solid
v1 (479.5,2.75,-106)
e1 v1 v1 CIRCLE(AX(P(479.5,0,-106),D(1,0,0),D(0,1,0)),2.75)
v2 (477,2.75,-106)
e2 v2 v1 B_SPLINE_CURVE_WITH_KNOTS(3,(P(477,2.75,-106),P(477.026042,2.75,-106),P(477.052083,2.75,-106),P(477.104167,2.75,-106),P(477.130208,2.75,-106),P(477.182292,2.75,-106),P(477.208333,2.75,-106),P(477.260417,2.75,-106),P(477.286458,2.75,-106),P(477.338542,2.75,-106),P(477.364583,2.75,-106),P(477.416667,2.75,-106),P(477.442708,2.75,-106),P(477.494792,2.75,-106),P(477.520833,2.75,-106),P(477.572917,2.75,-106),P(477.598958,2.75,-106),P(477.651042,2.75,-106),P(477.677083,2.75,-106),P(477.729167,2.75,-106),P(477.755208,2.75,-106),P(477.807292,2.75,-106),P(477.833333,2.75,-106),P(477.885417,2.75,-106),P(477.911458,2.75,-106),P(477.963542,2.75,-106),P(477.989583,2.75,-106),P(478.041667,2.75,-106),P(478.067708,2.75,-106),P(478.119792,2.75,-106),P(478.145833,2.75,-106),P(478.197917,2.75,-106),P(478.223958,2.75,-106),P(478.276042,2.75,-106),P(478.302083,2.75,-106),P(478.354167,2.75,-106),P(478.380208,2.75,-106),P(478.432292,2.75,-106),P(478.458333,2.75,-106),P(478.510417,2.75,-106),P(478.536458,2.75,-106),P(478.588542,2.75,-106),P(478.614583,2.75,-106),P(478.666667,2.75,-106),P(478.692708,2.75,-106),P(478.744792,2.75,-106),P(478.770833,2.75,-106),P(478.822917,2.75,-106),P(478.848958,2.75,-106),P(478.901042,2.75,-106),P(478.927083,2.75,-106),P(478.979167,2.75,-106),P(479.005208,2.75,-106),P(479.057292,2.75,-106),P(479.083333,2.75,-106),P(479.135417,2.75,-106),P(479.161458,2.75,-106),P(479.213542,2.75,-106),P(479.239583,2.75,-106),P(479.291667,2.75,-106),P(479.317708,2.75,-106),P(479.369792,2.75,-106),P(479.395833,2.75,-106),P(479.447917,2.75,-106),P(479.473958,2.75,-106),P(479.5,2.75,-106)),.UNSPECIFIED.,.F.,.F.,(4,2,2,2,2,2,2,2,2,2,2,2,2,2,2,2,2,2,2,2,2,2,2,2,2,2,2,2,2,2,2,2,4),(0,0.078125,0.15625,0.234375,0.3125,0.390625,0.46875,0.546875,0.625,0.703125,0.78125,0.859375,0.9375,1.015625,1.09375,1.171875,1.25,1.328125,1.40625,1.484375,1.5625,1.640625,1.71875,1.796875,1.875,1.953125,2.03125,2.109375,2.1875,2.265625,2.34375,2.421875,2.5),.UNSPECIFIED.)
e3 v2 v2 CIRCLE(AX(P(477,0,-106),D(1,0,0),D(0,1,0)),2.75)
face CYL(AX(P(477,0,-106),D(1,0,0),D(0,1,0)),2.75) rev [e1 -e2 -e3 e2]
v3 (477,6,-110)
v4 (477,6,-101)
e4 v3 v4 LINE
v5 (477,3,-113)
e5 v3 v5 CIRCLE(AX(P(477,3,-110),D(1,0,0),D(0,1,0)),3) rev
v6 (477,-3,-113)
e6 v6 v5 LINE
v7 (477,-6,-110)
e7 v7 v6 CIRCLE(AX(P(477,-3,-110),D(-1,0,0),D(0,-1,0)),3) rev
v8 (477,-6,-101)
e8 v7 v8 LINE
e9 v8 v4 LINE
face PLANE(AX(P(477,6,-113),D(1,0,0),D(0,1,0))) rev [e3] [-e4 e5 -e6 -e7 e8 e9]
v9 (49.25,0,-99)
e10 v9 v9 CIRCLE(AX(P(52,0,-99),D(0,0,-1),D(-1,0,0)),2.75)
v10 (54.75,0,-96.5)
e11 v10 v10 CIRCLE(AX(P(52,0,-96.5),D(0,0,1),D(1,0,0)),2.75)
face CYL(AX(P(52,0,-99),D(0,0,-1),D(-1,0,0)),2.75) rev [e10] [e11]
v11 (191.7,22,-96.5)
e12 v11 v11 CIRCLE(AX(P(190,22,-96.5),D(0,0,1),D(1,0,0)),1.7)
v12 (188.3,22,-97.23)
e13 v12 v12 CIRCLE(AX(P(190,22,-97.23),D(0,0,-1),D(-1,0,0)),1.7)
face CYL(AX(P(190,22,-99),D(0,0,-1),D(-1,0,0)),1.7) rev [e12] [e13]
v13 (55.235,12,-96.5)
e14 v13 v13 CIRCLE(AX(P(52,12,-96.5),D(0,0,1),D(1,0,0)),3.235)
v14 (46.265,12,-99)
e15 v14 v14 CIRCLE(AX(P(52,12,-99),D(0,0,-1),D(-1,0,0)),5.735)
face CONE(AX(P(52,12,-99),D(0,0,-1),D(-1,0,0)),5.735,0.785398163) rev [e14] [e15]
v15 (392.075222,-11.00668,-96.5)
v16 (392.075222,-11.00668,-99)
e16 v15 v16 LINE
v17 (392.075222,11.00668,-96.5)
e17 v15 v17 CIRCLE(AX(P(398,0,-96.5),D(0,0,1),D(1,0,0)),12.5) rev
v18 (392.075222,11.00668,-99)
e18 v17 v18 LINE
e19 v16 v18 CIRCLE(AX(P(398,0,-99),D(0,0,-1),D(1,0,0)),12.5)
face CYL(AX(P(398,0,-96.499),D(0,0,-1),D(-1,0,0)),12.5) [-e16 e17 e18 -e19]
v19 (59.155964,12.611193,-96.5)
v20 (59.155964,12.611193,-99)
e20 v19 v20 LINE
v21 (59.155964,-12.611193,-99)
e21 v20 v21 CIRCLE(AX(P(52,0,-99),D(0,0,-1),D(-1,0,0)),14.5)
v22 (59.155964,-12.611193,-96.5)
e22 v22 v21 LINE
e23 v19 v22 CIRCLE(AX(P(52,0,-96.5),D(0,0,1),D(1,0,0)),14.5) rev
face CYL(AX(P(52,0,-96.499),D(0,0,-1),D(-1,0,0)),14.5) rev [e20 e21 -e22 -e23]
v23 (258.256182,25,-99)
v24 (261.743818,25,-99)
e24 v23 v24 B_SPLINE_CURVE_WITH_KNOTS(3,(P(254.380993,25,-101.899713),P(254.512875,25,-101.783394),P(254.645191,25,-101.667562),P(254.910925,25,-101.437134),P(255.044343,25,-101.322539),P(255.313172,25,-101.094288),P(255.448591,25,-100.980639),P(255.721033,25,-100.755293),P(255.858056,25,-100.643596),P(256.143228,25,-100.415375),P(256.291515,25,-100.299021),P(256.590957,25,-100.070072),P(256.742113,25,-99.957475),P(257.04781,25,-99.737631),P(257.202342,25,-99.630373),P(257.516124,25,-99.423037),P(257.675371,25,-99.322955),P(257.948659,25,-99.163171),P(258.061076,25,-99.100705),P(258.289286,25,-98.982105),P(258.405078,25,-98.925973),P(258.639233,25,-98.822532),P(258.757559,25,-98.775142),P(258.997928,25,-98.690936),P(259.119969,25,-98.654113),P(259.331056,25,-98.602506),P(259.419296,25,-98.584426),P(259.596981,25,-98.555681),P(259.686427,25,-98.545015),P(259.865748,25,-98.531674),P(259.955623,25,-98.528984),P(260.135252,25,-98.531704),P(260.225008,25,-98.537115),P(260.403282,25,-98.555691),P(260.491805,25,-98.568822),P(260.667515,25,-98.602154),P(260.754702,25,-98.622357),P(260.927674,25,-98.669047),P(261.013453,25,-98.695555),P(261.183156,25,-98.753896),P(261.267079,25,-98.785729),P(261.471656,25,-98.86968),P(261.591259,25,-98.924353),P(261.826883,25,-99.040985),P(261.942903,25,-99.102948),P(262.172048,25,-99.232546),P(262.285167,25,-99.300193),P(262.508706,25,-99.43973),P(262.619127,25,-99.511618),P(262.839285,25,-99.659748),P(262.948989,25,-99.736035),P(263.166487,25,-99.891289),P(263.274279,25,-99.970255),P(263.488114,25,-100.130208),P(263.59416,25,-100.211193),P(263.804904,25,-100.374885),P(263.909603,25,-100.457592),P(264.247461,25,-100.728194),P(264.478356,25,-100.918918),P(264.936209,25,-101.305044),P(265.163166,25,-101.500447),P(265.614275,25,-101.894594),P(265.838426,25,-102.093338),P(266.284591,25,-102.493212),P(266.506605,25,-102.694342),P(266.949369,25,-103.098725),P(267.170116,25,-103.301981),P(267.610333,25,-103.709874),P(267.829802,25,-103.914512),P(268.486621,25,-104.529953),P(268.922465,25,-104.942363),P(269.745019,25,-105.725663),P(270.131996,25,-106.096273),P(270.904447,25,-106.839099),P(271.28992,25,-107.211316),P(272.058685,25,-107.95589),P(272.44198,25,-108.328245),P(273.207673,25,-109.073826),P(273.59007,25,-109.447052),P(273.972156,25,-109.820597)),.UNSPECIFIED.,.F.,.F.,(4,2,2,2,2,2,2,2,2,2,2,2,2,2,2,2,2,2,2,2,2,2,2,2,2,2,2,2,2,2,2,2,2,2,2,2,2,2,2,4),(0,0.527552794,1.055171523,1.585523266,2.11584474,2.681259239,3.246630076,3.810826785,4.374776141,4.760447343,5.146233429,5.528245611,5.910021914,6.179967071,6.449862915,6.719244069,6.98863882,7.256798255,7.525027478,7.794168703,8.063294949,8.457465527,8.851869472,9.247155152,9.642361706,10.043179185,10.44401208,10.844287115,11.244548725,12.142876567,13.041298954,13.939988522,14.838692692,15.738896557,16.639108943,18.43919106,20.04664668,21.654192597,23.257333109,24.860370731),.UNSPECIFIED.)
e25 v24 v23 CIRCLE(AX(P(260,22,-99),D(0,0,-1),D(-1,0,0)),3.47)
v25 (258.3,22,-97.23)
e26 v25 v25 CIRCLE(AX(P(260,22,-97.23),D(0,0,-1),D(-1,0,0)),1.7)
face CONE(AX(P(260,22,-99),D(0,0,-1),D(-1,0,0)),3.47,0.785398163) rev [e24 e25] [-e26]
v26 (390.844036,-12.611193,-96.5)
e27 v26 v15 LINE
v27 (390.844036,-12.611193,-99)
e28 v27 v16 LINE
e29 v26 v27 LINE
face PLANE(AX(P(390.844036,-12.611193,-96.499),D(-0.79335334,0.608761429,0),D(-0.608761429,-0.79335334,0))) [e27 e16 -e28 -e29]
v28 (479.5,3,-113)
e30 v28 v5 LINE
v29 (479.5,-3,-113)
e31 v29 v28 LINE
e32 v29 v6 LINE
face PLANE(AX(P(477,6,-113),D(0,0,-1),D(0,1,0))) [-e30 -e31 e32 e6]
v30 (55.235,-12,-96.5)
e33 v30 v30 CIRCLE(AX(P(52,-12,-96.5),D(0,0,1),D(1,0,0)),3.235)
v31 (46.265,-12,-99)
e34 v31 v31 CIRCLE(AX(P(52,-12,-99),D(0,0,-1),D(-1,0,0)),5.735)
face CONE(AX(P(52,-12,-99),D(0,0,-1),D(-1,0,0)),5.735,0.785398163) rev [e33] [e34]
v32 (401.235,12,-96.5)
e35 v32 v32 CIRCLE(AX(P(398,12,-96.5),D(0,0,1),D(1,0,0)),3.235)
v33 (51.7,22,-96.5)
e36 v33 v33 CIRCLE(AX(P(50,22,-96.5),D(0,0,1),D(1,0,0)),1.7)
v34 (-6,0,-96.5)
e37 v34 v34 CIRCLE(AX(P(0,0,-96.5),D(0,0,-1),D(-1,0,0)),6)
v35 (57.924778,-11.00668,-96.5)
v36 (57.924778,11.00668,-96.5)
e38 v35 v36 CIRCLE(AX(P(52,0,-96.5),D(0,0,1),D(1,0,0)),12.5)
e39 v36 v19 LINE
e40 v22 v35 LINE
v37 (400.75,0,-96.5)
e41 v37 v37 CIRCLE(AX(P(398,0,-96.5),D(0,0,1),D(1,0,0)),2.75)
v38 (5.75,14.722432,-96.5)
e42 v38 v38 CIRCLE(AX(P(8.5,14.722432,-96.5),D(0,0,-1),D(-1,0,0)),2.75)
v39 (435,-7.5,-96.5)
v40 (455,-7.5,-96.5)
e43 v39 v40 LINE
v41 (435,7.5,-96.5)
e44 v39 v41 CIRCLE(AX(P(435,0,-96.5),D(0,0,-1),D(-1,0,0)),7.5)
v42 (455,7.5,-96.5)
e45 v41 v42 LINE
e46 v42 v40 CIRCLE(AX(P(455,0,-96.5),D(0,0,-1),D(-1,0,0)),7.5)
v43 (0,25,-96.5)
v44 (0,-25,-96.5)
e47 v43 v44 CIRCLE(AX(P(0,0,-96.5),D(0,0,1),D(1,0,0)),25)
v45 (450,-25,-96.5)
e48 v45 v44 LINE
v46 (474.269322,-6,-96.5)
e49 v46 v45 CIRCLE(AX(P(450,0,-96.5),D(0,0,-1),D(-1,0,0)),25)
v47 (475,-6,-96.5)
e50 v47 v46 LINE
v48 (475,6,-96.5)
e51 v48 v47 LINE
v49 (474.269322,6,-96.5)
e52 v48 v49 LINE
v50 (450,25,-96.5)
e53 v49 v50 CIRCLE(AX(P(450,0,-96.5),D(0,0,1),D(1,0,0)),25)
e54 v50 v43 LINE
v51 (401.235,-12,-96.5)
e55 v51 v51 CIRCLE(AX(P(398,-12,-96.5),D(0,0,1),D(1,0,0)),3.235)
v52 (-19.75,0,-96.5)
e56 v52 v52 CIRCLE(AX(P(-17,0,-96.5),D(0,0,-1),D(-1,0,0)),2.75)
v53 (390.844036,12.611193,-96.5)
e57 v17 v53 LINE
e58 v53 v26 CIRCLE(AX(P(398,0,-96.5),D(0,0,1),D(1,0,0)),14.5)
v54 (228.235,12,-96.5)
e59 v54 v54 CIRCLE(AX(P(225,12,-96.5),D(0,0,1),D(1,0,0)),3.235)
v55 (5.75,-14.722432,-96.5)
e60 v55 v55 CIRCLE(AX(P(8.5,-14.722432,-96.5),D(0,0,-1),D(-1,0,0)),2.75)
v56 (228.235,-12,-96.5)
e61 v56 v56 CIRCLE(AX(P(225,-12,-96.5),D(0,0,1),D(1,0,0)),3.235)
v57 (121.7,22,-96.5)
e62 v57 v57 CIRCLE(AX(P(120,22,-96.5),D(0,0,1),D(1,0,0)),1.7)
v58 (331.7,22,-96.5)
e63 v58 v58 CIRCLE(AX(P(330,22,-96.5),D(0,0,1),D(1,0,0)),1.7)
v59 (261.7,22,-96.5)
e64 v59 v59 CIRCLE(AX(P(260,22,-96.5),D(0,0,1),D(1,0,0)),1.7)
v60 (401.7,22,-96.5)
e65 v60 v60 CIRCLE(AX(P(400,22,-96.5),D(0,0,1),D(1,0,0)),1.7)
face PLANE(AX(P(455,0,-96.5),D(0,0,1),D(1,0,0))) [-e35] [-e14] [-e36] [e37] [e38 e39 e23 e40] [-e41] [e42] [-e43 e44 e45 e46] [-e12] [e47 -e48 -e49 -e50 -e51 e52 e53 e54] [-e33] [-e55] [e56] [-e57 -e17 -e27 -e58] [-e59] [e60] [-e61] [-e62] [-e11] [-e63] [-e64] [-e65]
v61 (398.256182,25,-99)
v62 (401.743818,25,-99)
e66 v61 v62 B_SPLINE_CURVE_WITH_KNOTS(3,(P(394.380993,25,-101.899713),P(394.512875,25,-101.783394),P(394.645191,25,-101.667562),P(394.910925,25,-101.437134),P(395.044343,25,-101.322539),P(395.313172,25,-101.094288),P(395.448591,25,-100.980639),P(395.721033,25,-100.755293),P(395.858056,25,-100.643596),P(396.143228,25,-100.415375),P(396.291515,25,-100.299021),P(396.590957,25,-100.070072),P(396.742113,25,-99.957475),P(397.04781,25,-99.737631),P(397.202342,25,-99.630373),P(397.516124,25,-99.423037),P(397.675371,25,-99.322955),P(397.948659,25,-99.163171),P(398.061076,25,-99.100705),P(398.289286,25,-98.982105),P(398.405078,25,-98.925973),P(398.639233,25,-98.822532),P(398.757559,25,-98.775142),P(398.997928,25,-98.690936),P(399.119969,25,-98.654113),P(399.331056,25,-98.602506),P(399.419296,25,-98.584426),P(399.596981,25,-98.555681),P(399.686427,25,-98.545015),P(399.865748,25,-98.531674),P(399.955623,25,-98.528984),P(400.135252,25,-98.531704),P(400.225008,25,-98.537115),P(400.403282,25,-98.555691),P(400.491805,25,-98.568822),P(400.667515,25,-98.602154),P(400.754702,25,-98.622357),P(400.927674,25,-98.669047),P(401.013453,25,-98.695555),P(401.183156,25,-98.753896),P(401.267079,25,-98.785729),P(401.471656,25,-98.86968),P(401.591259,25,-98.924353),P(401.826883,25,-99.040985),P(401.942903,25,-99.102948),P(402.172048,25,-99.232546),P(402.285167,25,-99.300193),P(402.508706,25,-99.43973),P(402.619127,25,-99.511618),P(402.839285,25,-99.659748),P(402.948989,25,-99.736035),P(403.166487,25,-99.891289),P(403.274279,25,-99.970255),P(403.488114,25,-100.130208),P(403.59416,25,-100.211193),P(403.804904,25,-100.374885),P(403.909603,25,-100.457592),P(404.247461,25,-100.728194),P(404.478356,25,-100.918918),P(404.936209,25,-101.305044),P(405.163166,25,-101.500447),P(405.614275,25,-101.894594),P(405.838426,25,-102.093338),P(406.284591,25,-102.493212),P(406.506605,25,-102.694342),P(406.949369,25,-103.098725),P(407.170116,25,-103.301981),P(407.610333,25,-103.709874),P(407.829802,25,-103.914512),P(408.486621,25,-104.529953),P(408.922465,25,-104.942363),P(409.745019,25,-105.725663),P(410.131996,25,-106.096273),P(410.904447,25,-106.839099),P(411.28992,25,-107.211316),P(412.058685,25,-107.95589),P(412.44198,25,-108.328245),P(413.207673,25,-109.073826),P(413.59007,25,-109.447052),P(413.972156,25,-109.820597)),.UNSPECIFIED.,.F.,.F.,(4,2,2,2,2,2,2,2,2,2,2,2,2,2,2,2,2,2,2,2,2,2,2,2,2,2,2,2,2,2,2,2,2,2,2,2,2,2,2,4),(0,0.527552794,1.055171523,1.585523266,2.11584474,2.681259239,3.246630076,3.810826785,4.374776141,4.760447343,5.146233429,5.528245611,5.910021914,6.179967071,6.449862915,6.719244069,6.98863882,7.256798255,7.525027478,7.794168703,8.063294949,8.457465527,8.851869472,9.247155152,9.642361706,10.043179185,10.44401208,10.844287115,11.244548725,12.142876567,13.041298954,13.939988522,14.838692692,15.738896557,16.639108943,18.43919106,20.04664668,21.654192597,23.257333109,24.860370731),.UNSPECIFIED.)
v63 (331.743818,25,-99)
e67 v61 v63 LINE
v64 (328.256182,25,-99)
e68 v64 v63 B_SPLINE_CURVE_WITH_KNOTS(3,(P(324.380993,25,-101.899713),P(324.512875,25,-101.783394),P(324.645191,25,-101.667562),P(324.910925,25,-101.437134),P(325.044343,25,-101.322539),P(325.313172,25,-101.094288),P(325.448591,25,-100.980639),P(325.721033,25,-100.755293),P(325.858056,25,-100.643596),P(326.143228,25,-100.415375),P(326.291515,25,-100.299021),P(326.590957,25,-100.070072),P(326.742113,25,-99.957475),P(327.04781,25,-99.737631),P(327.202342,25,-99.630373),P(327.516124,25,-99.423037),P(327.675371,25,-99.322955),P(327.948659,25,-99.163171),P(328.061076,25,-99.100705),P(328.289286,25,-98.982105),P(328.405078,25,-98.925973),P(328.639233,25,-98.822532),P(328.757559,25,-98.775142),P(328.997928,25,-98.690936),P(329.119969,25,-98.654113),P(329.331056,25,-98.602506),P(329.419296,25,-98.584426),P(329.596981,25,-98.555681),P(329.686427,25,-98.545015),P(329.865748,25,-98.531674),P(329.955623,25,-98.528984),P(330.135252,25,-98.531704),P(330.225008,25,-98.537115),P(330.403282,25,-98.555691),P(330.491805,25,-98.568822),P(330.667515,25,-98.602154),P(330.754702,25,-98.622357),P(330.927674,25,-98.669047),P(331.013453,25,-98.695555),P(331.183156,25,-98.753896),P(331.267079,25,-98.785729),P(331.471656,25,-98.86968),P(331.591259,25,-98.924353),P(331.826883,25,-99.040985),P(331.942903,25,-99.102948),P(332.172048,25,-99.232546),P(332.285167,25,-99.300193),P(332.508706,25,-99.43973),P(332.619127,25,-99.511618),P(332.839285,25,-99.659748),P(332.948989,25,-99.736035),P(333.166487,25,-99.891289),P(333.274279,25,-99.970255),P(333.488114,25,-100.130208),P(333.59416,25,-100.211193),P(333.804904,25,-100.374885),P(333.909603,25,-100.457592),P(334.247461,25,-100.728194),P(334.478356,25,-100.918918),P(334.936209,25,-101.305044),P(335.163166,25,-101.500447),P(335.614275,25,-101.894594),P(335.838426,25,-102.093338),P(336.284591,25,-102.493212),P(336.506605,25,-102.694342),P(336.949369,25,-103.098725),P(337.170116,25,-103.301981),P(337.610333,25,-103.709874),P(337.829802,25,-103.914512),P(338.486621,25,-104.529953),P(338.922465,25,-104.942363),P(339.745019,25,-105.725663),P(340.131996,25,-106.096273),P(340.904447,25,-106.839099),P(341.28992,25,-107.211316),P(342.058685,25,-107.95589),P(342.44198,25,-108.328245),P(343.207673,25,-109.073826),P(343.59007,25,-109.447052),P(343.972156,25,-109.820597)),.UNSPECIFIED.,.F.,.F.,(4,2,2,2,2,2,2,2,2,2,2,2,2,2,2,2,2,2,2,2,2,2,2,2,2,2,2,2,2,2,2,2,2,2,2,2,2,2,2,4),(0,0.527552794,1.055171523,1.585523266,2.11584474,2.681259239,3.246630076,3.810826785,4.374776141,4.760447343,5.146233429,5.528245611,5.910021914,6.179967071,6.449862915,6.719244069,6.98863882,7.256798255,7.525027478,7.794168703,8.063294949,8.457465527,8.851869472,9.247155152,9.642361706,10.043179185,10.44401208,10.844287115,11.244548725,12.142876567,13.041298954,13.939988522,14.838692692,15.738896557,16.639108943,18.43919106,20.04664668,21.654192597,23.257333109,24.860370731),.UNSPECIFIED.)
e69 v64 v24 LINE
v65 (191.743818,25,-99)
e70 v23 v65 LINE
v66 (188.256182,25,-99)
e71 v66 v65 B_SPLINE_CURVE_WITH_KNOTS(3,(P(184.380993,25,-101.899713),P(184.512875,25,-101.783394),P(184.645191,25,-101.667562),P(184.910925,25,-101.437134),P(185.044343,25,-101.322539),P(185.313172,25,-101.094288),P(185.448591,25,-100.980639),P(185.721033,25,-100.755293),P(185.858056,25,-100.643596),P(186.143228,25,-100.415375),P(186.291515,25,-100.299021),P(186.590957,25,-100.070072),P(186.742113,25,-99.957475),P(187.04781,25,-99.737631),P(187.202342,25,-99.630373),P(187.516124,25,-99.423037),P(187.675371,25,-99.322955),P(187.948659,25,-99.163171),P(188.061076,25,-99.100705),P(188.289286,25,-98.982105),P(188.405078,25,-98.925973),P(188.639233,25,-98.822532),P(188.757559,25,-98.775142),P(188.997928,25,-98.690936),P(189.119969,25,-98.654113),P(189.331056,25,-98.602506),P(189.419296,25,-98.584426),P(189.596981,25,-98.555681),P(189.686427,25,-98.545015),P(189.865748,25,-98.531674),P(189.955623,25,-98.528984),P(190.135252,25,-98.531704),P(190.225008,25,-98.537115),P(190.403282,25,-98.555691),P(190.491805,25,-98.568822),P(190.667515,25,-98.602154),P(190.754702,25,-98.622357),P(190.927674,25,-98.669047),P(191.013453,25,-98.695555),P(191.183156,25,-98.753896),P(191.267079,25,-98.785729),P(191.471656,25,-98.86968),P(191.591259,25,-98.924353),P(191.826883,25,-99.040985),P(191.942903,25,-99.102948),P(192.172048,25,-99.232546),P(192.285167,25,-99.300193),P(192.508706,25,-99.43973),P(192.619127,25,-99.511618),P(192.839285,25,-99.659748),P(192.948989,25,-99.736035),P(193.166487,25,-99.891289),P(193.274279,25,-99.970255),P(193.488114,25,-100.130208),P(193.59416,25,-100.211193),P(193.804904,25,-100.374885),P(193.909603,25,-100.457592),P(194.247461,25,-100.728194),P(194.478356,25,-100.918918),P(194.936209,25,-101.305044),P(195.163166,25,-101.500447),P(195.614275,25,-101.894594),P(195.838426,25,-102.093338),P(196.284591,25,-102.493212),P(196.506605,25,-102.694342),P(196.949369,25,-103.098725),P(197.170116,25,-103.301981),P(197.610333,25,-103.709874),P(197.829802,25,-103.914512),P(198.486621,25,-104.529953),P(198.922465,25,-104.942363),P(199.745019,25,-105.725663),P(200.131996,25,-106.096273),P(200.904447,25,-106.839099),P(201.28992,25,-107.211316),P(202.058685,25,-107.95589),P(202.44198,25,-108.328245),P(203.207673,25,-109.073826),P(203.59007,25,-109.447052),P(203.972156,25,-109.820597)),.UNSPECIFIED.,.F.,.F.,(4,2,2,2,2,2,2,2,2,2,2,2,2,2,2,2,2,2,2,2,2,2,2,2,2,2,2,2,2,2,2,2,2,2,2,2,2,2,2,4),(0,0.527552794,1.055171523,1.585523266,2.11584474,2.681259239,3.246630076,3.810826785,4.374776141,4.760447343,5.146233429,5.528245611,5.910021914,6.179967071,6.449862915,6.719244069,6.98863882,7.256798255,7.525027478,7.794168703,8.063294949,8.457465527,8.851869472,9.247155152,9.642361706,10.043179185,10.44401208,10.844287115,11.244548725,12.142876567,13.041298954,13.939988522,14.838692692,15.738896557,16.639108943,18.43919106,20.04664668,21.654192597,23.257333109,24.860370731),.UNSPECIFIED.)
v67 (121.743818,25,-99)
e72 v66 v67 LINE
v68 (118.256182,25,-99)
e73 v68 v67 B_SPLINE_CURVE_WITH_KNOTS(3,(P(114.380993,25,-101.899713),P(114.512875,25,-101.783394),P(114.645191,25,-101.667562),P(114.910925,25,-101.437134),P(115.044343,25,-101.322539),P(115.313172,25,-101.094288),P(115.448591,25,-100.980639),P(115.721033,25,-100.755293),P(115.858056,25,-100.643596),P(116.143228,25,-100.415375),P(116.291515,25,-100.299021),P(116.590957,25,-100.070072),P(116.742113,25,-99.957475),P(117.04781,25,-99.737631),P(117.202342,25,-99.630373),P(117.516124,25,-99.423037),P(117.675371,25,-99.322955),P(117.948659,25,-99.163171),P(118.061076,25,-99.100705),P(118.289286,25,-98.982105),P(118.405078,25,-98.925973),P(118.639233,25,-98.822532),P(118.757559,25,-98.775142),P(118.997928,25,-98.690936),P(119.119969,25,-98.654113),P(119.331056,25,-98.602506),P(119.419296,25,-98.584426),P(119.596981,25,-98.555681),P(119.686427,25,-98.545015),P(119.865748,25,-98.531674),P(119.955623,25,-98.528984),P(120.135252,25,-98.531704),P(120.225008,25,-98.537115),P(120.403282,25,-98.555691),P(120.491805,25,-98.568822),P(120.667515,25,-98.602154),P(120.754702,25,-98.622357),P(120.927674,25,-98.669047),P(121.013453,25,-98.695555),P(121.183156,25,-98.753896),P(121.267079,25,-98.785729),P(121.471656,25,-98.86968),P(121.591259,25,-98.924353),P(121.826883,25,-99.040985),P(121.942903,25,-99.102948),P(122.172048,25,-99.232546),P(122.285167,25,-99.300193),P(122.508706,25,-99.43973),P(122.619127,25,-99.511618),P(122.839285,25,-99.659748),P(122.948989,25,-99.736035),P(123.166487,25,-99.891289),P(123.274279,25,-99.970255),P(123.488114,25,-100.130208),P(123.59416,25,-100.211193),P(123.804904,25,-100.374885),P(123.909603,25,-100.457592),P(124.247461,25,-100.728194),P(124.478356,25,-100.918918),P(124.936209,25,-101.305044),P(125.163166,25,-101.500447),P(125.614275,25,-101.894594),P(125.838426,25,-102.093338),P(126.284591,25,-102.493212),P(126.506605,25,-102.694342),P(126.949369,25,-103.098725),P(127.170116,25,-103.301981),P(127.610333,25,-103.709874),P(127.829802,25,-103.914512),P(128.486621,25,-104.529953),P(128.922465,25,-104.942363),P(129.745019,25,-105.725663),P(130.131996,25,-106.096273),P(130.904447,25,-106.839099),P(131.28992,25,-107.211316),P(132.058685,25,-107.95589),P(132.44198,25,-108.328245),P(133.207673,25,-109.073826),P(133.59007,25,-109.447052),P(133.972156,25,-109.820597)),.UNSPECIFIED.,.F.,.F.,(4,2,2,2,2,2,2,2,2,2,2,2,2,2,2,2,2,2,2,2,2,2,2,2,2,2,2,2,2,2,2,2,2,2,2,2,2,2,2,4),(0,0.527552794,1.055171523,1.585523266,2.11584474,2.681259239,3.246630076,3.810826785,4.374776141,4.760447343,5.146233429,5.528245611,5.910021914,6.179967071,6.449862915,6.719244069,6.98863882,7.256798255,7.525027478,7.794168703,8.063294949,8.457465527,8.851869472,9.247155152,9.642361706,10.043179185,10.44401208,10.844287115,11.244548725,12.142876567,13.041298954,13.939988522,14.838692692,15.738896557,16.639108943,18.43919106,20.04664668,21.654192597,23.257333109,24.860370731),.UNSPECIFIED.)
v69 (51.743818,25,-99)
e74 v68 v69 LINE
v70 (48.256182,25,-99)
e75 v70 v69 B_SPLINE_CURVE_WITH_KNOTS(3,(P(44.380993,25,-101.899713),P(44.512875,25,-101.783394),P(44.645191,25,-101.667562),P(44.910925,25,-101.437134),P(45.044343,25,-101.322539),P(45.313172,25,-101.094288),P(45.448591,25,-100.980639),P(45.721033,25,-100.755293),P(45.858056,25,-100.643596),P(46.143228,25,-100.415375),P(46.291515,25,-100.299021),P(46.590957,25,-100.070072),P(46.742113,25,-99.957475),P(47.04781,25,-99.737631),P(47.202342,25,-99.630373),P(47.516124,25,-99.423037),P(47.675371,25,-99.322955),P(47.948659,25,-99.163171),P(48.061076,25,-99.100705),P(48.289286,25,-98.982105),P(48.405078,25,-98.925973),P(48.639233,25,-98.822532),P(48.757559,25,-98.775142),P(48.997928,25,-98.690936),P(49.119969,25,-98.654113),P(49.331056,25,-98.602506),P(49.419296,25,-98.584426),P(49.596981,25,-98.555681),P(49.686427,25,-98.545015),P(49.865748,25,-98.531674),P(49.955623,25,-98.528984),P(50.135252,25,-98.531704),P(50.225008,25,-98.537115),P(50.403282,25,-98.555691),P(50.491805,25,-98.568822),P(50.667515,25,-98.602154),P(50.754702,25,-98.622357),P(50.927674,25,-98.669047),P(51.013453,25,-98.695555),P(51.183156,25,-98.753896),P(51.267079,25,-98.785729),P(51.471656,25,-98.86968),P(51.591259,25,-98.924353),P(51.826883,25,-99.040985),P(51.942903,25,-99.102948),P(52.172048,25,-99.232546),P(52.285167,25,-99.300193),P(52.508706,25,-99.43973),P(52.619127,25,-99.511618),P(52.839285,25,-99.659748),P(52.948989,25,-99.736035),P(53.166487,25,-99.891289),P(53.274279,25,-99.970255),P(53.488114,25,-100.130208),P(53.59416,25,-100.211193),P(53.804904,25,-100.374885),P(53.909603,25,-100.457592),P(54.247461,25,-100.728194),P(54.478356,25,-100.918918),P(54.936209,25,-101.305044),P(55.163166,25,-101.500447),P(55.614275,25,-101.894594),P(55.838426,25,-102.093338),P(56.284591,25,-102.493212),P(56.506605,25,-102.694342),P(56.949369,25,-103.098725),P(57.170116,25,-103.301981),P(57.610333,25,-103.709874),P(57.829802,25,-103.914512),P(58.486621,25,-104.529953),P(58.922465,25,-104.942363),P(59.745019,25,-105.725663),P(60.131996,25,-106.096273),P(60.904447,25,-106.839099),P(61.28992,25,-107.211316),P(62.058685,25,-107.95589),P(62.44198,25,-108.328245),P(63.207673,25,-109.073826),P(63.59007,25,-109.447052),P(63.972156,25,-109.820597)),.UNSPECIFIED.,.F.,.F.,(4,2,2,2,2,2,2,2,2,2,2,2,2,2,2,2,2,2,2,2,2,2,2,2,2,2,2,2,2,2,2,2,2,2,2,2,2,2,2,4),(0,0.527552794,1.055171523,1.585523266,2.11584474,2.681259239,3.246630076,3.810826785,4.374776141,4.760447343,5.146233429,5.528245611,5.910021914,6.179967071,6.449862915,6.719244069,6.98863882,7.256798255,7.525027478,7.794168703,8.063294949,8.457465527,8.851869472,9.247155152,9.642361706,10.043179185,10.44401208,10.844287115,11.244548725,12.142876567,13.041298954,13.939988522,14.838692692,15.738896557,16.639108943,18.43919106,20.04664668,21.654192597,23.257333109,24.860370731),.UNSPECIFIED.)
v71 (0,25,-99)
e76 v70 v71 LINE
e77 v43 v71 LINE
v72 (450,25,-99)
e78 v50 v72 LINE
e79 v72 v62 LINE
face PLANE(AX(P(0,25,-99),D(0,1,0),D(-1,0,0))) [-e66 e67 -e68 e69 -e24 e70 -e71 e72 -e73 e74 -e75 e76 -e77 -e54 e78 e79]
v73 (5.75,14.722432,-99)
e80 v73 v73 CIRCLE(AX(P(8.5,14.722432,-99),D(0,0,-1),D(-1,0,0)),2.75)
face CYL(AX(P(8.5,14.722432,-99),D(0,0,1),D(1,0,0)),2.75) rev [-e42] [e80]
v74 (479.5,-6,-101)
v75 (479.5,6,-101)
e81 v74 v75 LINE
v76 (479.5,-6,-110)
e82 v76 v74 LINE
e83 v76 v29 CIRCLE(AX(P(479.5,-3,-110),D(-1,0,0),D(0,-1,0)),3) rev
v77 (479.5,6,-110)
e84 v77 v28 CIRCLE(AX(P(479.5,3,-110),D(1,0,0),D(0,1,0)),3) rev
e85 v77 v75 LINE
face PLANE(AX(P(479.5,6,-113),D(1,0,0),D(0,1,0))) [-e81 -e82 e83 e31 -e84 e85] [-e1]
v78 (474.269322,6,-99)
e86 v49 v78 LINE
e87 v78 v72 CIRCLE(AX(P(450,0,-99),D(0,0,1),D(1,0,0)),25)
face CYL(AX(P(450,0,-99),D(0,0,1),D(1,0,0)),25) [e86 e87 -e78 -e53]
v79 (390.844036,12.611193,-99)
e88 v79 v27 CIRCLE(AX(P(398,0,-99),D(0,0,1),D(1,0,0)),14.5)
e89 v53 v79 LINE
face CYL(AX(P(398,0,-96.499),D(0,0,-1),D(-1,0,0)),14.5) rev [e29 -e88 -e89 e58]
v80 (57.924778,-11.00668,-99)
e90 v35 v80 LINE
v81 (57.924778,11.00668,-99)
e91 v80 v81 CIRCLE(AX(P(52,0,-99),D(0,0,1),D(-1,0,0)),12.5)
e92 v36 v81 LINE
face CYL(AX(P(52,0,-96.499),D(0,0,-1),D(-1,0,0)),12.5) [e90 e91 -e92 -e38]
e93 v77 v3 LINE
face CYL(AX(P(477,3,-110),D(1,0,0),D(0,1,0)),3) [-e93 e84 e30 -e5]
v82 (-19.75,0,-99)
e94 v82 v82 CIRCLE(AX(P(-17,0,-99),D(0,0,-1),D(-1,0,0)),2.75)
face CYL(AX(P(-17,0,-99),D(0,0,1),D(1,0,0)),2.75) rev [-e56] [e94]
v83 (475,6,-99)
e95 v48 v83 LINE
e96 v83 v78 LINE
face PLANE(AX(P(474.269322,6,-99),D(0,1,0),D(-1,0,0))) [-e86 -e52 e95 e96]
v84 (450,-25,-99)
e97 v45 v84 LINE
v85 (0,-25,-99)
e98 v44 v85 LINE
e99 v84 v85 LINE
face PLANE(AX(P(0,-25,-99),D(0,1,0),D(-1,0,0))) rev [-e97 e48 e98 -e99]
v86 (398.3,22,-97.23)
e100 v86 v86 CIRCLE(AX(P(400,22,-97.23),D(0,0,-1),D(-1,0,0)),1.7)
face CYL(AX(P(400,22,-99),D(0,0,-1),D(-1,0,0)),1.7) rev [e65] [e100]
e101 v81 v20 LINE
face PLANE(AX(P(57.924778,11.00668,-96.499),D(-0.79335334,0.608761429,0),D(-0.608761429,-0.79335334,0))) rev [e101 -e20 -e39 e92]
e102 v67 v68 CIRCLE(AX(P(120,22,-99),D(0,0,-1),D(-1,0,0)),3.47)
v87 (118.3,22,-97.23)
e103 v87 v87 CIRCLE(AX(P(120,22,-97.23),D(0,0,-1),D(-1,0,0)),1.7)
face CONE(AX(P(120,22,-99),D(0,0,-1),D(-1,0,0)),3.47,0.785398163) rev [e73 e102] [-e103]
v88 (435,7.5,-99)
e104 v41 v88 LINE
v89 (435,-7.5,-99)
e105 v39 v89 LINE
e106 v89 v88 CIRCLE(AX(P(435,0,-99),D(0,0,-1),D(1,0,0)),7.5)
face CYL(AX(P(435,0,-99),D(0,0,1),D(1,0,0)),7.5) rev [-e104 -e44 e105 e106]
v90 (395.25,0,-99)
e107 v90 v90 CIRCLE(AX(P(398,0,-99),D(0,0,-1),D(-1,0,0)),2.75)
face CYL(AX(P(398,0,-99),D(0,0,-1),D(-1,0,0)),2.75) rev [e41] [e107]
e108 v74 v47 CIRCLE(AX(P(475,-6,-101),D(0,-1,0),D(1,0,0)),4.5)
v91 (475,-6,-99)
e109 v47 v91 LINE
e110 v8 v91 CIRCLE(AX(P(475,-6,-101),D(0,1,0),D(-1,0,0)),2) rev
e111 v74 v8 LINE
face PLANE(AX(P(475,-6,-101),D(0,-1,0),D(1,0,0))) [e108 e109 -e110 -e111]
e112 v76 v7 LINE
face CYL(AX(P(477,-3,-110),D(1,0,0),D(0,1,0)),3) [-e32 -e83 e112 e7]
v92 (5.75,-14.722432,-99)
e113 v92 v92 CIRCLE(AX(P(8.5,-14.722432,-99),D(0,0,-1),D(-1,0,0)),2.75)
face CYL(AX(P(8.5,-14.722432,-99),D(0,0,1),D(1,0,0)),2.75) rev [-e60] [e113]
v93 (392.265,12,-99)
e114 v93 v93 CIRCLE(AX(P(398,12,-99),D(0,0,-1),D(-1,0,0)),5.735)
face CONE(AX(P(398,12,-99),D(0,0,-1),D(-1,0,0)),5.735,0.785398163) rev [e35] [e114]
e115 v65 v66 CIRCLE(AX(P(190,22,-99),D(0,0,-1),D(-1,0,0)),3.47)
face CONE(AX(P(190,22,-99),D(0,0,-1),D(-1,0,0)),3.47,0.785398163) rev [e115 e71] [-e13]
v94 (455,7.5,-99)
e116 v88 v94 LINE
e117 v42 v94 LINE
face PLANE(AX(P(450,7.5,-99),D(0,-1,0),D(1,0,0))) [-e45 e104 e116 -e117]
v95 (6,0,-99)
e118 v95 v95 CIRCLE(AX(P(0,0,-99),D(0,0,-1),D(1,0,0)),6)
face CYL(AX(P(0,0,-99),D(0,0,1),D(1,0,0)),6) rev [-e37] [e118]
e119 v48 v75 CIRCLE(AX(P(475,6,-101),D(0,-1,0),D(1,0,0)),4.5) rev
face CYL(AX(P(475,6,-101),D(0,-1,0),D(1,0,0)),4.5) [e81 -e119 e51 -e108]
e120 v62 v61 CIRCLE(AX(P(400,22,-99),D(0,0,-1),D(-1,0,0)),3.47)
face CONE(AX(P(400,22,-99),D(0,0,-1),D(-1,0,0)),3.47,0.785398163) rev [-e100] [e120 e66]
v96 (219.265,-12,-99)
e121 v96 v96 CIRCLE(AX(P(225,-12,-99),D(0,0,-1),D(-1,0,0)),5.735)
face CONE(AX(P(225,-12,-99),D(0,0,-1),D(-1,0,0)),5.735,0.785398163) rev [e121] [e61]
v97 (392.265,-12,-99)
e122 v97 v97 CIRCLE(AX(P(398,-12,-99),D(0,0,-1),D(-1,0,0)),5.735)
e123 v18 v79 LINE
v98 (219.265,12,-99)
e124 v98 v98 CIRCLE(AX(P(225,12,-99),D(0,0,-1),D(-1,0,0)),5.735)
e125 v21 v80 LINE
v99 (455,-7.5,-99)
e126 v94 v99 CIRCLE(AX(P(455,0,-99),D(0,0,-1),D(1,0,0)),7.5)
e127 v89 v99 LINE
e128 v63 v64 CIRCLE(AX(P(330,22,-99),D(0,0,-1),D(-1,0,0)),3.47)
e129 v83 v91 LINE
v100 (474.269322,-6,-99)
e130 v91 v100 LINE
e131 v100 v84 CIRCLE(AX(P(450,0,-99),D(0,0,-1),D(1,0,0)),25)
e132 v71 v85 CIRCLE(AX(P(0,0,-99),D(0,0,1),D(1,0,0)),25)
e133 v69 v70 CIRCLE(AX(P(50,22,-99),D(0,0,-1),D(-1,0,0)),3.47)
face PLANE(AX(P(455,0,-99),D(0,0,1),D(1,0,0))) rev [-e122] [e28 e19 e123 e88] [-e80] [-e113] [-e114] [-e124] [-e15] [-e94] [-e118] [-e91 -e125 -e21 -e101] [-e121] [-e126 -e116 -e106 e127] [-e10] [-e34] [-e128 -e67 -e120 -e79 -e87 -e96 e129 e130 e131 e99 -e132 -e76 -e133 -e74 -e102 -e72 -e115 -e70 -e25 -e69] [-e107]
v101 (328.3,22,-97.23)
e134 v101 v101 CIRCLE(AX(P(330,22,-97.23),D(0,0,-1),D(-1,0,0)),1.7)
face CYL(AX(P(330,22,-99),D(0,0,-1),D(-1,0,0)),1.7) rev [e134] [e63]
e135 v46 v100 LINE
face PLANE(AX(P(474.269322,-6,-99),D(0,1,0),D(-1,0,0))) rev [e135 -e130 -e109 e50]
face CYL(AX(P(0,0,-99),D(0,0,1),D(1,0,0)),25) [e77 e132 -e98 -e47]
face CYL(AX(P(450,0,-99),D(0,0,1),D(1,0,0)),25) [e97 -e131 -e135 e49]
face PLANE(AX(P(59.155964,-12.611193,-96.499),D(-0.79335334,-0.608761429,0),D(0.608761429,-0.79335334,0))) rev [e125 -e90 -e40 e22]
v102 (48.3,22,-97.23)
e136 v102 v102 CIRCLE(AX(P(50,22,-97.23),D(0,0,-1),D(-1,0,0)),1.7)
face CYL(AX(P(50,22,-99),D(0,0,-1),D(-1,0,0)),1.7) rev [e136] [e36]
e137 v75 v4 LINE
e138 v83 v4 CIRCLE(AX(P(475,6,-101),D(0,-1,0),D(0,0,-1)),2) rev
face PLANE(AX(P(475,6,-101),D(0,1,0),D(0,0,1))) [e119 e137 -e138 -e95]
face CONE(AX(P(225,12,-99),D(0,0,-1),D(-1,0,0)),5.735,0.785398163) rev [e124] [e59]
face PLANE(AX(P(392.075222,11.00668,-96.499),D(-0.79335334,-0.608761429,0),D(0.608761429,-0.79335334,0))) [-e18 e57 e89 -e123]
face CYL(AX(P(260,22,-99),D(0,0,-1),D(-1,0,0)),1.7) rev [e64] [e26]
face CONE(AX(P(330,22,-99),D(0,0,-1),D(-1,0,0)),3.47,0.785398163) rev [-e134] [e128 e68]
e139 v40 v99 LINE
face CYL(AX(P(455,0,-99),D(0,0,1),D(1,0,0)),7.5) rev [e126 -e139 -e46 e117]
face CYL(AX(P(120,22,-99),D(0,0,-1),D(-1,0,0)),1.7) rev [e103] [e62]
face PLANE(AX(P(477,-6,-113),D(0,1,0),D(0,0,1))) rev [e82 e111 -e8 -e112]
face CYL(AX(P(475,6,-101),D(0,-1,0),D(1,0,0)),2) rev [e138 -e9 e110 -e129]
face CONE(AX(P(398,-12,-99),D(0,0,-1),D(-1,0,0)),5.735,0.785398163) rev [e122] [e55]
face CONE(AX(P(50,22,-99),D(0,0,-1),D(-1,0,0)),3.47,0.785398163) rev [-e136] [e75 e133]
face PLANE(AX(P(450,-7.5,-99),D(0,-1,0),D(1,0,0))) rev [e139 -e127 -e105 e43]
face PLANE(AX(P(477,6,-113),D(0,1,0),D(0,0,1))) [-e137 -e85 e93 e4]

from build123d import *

# Parameters (mm, degrees)
AUFSATZ_LINEAR_START                        = -96.5
AUFSATZ_LINEAR_AUSTRAGEN1_DEPTH             = 2.5
SKIZZE3_W                                   = 2.5
SKIZZE3_H                                   = 6
AUFSATZ_LINEAR_AUSTRAGEN2_DEPTH             = 14
VERRUNDUNG1_R                               = 3
DURCHGANGSLOCH_F_R_M51_D                    = 5.5
KREISMUSTER1_COUNT                          = 3
DURCHGANGSLOCH_F_R_M5_EINSTELLSCHRAUBE_D    = 5.5
VOLUMENK_RPER_START                         = -6
VOLUMENK_RPER_UMWANDELN2_DEPTH              = 12
VOLUMENK_RPER_UMWANDELN2_2_DEPTH            = 12
FORMSENKUNG_F_R_M3_SENKSCHRAUBE_MIT_2_COUNT = 2
FORMSENKUNG_F_R_M3_SENKSCHRAUBE_MIT_2_PITCH = 70
FORMSENKUNG_F_R_M3_SENKSCHRAUBE_MIT_3_COUNT = 2
FORMSENKUNG_F_R_M3_SENKSCHRAUBE_MIT_3_PITCH = 140
FORMSENKUNG_F_R_M3_SENKSCHRAUBE_MIT_4_COUNT = 2
FORMSENKUNG_F_R_M3_SENKSCHRAUBE_MIT_4_PITCH = 210
FORMSENKUNG_F_R_M3_SENKSCHRAUBE_MIT_5_COUNT = 2
FORMSENKUNG_F_R_M3_SENKSCHRAUBE_MIT_5_PITCH = 280
FORMSENKUNG_F_R_M3_SENKSCHRAUBE_MIT_6_COUNT = 2
FORMSENKUNG_F_R_M3_SENKSCHRAUBE_MIT_6_PITCH = 350
FORMSENKUNG_F_R_M5_SENKSCHRAUBE_MIT_2_COUNT = 2
FORMSENKUNG_F_R_M5_SENKSCHRAUBE_MIT_2_PITCH = 173
DURCHGANGSLOCH_F_R_M52_D                    = 5.5
SCHNITT_LINEAR_AUSTRAGEN1_REACH             = 482.355


# Read off the part's stored shape, not the designer's step: Volumenkörper umwandeln2
with BuildPart() as part:
    # Skizze1 → Aufsatz-Linear austragen1 (new body)
    with BuildSketch(Plane.XY.offset(AUFSATZ_LINEAR_START)):
        with BuildLine():
            Line((462.5, 0), (475, 0))
            Line((475, 0), (477, 0))
            Line((477, 0), (479.5, 0))
            Line((479.5, 0), (479.5, 6))
            Line((479.5, 6), (474.269322199, 6))
            ThreePointArc((474.269322199, 6), (465.411035007, 19.685019685), (450, 25))
            Line((450, 25), (0, 25))
            ThreePointArc((0, 25), (-17.67766953, 17.67766953), (-25, 0))
            Line((-25, 0), (-6, 0))
            ThreePointArc((-6, 0), (0, 6), (6, 0))
            Line((6, 0), (427.5, 0))
            ThreePointArc((427.5, 0), (429.696699141, 5.303300859), (435, 7.5))
            Line((435, 7.5), (450, 7.5))
            Line((450, 7.5), (455, 7.5))
            ThreePointArc((455, 7.5), (460.303300859, 5.303300859), (462.5, 0))
        make_face()
    extrude(amount=-AUFSATZ_LINEAR_AUSTRAGEN1_DEPTH)

    # Skizze3 → Aufsatz-Linear austragen2 (add)
    with BuildSketch(Plane(origin=(0, 0, -99), x_dir=(-1, 0, 0), z_dir=(0, 0, -1))):
        with Locations((-478.25, 3)):
            Rectangle(SKIZZE3_W, SKIZZE3_H)
    extrude(amount=AUFSATZ_LINEAR_AUSTRAGEN2_DEPTH)

    # Verrundung1
    verrundung1_edges = [part.edges().sort_by_distance(p)[0] for p in [
        (478.25, 6, -113),
    ]]
    fillet(verrundung1_edges, radius=VERRUNDUNG1_R)

    # Spiegeln1: part across plane


with BuildPart() as part_1:
    add(part.part)
    add(part.part.mirror(Plane(origin=(6, 0, -99), x_dir=(0, 0, 1), z_dir=(0, -1, 0))))

    # Durchgangsloch für M51 (through all)
    with Locations(Plane(origin=(0, 0, -99), x_dir=(-1, 0, 0), z_dir=(0, 0, -1))):
        with Locations((17, 0)):
            durchgangsloch_f_r_m51 = Hole(DURCHGANGSLOCH_F_R_M51_D / 2)

    # Kreismuster1: Durchgangsloch für M51 ×3 about axis
    kreismuster1_axis = Axis((0, 0, 0), (0, 0, 1))
    for i in range(1, KREISMUSTER1_COUNT):
        add(durchgangsloch_f_r_m51.rotate(kreismuster1_axis, i * 360 / KREISMUSTER1_COUNT), mode=Mode.SUBTRACT)

    # Durchgangsloch für M5 Einstellschraube (through all)
    with Locations(Plane(origin=(479.5, 0, 0), x_dir=(0, 0, -1), z_dir=(1, 0, 0))):
        with Locations((106, 0)):
            Hole(DURCHGANGSLOCH_F_R_M5_EINSTELLSCHRAUBE_D / 2)

    # Volumenkörper umwandeln2 outline → Volumenkörper umwandeln2 (cut)
    with BuildSketch(Plane(origin=(0, 0, 0), x_dir=(1, 0, 0), z_dir=(0, 1, 0)).offset(VOLUMENK_RPER_START)):
        with BuildLine():
            Line((479.5, 96.5), (479.5, 101))
            ThreePointArc((479.5, 101), (478.181980515, 97.818019485), (475, 96.5))
            Line((475, 96.5), (479.5, 96.5))
        make_face()
    extrude(amount=VOLUMENK_RPER_UMWANDELN2_DEPTH, mode=Mode.SUBTRACT)

    # Volumenk_rper umwandeln2 2 outline → Volumenk_rper umwandeln2 2 (add)
    with BuildSketch(Plane(origin=(0, 0, 0), x_dir=(1, 0, 0), z_dir=(0, 1, 0)).offset(VOLUMENK_RPER_START)):
        with BuildLine():
            Line((477, 99), (477, 101))
            ThreePointArc((477, 101), (476.414213562, 99.585786438), (475, 99))
            Line((475, 99), (477, 99))
        make_face()
    extrude(amount=VOLUMENK_RPER_UMWANDELN2_2_DEPTH)

    # Skizze13 → Formsenkung für M3 Senkschraube mit Innensechskant1 (revolve, cut)
    with BuildSketch(Plane(origin=(400, 22, -99), x_dir=(0, 1, 0), z_dir=(1, 0, 0))):
        Polygon((0, 0), (0, 2.5), (1.7, 2.5), (1.7, 1.77), (3.47, 0), align=None)
    formsenkung_f_r_m3_senkschraube_mit_inne = revolve(axis=Axis((400, 22, -105.35), (0, 0, 1)), mode=Mode.SUBTRACT)

    # Formsenkung f_r M3 Senkschraube mit  2: Formsenkung für M3 Senkschraube mit Innensechskant1 ×2
    with Locations(*[(-i * FORMSENKUNG_F_R_M3_SENKSCHRAUBE_MIT_2_PITCH, 0, 0) for i in range(1, FORMSENKUNG_F_R_M3_SENKSCHRAUBE_MIT_2_COUNT)]):
        add(formsenkung_f_r_m3_senkschraube_mit_inne, mode=Mode.SUBTRACT)

    # Formsenkung f_r M3 Senkschraube mit  3: Formsenkung für M3 Senkschraube mit Innensechskant1 ×2
    with Locations(*[(-i * FORMSENKUNG_F_R_M3_SENKSCHRAUBE_MIT_3_PITCH, 0, 0) for i in range(1, FORMSENKUNG_F_R_M3_SENKSCHRAUBE_MIT_3_COUNT)]):
        add(formsenkung_f_r_m3_senkschraube_mit_inne, mode=Mode.SUBTRACT)

    # Formsenkung f_r M3 Senkschraube mit  4: Formsenkung für M3 Senkschraube mit Innensechskant1 ×2
    with Locations(*[(-i * FORMSENKUNG_F_R_M3_SENKSCHRAUBE_MIT_4_PITCH, 0, 0) for i in range(1, FORMSENKUNG_F_R_M3_SENKSCHRAUBE_MIT_4_COUNT)]):
        add(formsenkung_f_r_m3_senkschraube_mit_inne, mode=Mode.SUBTRACT)

    # Formsenkung f_r M3 Senkschraube mit  5: Formsenkung für M3 Senkschraube mit Innensechskant1 ×2
    with Locations(*[(-i * FORMSENKUNG_F_R_M3_SENKSCHRAUBE_MIT_5_PITCH, 0, 0) for i in range(1, FORMSENKUNG_F_R_M3_SENKSCHRAUBE_MIT_5_COUNT)]):
        add(formsenkung_f_r_m3_senkschraube_mit_inne, mode=Mode.SUBTRACT)

    # Formsenkung f_r M3 Senkschraube mit  6: Formsenkung für M3 Senkschraube mit Innensechskant1 ×2
    with Locations(*[(-i * FORMSENKUNG_F_R_M3_SENKSCHRAUBE_MIT_6_PITCH, 0, 0) for i in range(1, FORMSENKUNG_F_R_M3_SENKSCHRAUBE_MIT_6_COUNT)]):
        add(formsenkung_f_r_m3_senkschraube_mit_inne, mode=Mode.SUBTRACT)

    # Skizze15 → Formsenkung für M5 Senkschraube mit Innensechskant1 (revolve, cut)
    with BuildSketch(Plane(origin=(52, 12, -99), x_dir=(0, 1, 0), z_dir=(1, 0, 0))):
        Polygon((0, 0), (0, 2.5), (2.75, 2.5), (2.75, 2.985), (5.735, 0), align=None)
    formsenkung_f_r_m5_senkschraube_mit_inne = revolve(axis=Axis((52, 12, -105.35), (0, 0, 1)), mode=Mode.SUBTRACT)

    # Formsenkung f_r M5 Senkschraube mit  2: Formsenkung für M5 Senkschraube mit Innensechskant1 ×2
    with Locations(*[(i * FORMSENKUNG_F_R_M5_SENKSCHRAUBE_MIT_2_PITCH, 0, 0) for i in range(1, FORMSENKUNG_F_R_M5_SENKSCHRAUBE_MIT_2_COUNT)]):
        add(formsenkung_f_r_m5_senkschraube_mit_inne, mode=Mode.SUBTRACT)

    # Spiegeln2: Formsenkung für M5 Senkschraube mit Innensechskant1 across plane
    add(formsenkung_f_r_m5_senkschraube_mit_inne.mirror(Plane(origin=(225, 0, 0), x_dir=(0, 0, 1), z_dir=(1, 0, 0))), mode=Mode.SUBTRACT)

    # Spiegeln2 copy 1 sketch → Spiegeln2 copy 1 (revolve, cut)
    with BuildSketch(Plane(origin=(225, 12, -99), x_dir=(0, 1, 0), z_dir=(-1, 0, 0))):
        Polygon((0, 0), (0, -2.5), (2.75, -2.5), (2.75, -2.985), (5.735, 0), align=None)
    revolve(axis=Axis((225, 12, -105.35), (0, 0, -1)), mode=Mode.SUBTRACT)

    # Spiegeln2 at the second plane: Formsenkung für M5 Senkschraube mit Innensechskant1 across plane
    add(formsenkung_f_r_m5_senkschraube_mit_inne.mirror(Plane.ZX), mode=Mode.SUBTRACT)

    # Spiegeln2 at the second plane copy 1 ske → Spiegeln2 at the second plane copy 1 (revolve, cut)
    with BuildSketch(Plane(origin=(225, -12, -99), x_dir=(0, -1, 0), z_dir=(1, 0, 0))):
        Polygon((0, 0), (0, -2.5), (2.75, -2.5), (2.75, -2.985), (5.735, 0), align=None)
    revolve(axis=Axis((225, -12, -105.35), (0, 0, -1)), mode=Mode.SUBTRACT)

    # Spiegeln2 at the second plane copy 2 ske → Spiegeln2 at the second plane copy 2 (revolve, cut)
    with BuildSketch(Plane(origin=(398, -12, -99), x_dir=(0, -1, 0), z_dir=(-1, 0, 0))):
        Polygon((0, 0), (0, 2.5), (2.75, 2.5), (2.75, 2.985), (5.735, 0), align=None)
    revolve(axis=Axis((398, -12, -105.35), (0, 0, 1)), mode=Mode.SUBTRACT)

    # Spiegeln2 at the second plane copy 3 ske → Spiegeln2 at the second plane copy 3 (revolve, cut)
    with BuildSketch(Plane(origin=(225, -12, -99), x_dir=(0, -1, 0), z_dir=(-1, 0, 0))):
        Polygon((0, 0), (0, 2.5), (2.75, 2.5), (2.75, 2.985), (5.735, 0), align=None)
    revolve(axis=Axis((225, -12, -105.35), (0, 0, 1)), mode=Mode.SUBTRACT)

    # Durchgangsloch für M52 (through all)
    with Locations(Plane(origin=(0, 0, -99), x_dir=(-1, 0, 0), z_dir=(0, 0, -1))):
        with Locations((-52, 0)):
            durchgangsloch_f_r_m52 = Hole(DURCHGANGSLOCH_F_R_M52_D / 2)

    # Skizze19 → Schnitt-Linear austragen1 (cut, up to next)
    with BuildSketch(Plane(origin=(0, 0, -99), x_dir=(-1, 0, 0), z_dir=(0, 0, -1)), mode=Mode.PRIVATE) as schnitt_linear_austragen1_sk1:
        with BuildLine():
            Line((-59.155963734, -12.611192768), (-57.924777873, -11.006680115))
            ThreePointArc((-57.924777873, -11.006680115), (-64.5, 0), (-57.924777873, 11.006680115))
            Line((-57.924777873, 11.006680115), (-59.155963734, 12.611192768))
            ThreePointArc((-59.155963734, 12.611192768), (-60.01066697, 12.086323457), (-60.827040721, 11.503623434))
            ThreePointArc((-60.827040721, 11.503623434), (-66.5, 0), (-60.827040721, -11.503623434))
            ThreePointArc((-60.827040721, -11.503623434), (-60.01066697, -12.086323457), (-59.155963734, -12.611192768))
        make_face()
    schnitt_linear_austragen1_tool1 = extrude(schnitt_linear_austragen1_sk1.sketch, amount=-SCHNITT_LINEAR_AUSTRAGEN1_REACH, mode=Mode.PRIVATE) & part_1.part
    schnitt_linear_austragen1 = schnitt_linear_austragen1_tool1.solids().sort_by_distance((59.86349, -11.864266, -99))[0]
    add(schnitt_linear_austragen1, mode=Mode.SUBTRACT)

    # Spiegeln3: Durchgangsloch für M52, Schnitt-Linear austragen1 across plane
    add(durchgangsloch_f_r_m52.mirror(Plane(origin=(225, 0, 0), x_dir=(0, 0, 1), z_dir=(1, 0, 0))), mode=Mode.SUBTRACT)
    add(schnitt_linear_austragen1.mirror(Plane(origin=(225, 0, 0), x_dir=(0, 0, 1), z_dir=(1, 0, 0))), mode=Mode.SUBTRACT)


solid = part_1.part
